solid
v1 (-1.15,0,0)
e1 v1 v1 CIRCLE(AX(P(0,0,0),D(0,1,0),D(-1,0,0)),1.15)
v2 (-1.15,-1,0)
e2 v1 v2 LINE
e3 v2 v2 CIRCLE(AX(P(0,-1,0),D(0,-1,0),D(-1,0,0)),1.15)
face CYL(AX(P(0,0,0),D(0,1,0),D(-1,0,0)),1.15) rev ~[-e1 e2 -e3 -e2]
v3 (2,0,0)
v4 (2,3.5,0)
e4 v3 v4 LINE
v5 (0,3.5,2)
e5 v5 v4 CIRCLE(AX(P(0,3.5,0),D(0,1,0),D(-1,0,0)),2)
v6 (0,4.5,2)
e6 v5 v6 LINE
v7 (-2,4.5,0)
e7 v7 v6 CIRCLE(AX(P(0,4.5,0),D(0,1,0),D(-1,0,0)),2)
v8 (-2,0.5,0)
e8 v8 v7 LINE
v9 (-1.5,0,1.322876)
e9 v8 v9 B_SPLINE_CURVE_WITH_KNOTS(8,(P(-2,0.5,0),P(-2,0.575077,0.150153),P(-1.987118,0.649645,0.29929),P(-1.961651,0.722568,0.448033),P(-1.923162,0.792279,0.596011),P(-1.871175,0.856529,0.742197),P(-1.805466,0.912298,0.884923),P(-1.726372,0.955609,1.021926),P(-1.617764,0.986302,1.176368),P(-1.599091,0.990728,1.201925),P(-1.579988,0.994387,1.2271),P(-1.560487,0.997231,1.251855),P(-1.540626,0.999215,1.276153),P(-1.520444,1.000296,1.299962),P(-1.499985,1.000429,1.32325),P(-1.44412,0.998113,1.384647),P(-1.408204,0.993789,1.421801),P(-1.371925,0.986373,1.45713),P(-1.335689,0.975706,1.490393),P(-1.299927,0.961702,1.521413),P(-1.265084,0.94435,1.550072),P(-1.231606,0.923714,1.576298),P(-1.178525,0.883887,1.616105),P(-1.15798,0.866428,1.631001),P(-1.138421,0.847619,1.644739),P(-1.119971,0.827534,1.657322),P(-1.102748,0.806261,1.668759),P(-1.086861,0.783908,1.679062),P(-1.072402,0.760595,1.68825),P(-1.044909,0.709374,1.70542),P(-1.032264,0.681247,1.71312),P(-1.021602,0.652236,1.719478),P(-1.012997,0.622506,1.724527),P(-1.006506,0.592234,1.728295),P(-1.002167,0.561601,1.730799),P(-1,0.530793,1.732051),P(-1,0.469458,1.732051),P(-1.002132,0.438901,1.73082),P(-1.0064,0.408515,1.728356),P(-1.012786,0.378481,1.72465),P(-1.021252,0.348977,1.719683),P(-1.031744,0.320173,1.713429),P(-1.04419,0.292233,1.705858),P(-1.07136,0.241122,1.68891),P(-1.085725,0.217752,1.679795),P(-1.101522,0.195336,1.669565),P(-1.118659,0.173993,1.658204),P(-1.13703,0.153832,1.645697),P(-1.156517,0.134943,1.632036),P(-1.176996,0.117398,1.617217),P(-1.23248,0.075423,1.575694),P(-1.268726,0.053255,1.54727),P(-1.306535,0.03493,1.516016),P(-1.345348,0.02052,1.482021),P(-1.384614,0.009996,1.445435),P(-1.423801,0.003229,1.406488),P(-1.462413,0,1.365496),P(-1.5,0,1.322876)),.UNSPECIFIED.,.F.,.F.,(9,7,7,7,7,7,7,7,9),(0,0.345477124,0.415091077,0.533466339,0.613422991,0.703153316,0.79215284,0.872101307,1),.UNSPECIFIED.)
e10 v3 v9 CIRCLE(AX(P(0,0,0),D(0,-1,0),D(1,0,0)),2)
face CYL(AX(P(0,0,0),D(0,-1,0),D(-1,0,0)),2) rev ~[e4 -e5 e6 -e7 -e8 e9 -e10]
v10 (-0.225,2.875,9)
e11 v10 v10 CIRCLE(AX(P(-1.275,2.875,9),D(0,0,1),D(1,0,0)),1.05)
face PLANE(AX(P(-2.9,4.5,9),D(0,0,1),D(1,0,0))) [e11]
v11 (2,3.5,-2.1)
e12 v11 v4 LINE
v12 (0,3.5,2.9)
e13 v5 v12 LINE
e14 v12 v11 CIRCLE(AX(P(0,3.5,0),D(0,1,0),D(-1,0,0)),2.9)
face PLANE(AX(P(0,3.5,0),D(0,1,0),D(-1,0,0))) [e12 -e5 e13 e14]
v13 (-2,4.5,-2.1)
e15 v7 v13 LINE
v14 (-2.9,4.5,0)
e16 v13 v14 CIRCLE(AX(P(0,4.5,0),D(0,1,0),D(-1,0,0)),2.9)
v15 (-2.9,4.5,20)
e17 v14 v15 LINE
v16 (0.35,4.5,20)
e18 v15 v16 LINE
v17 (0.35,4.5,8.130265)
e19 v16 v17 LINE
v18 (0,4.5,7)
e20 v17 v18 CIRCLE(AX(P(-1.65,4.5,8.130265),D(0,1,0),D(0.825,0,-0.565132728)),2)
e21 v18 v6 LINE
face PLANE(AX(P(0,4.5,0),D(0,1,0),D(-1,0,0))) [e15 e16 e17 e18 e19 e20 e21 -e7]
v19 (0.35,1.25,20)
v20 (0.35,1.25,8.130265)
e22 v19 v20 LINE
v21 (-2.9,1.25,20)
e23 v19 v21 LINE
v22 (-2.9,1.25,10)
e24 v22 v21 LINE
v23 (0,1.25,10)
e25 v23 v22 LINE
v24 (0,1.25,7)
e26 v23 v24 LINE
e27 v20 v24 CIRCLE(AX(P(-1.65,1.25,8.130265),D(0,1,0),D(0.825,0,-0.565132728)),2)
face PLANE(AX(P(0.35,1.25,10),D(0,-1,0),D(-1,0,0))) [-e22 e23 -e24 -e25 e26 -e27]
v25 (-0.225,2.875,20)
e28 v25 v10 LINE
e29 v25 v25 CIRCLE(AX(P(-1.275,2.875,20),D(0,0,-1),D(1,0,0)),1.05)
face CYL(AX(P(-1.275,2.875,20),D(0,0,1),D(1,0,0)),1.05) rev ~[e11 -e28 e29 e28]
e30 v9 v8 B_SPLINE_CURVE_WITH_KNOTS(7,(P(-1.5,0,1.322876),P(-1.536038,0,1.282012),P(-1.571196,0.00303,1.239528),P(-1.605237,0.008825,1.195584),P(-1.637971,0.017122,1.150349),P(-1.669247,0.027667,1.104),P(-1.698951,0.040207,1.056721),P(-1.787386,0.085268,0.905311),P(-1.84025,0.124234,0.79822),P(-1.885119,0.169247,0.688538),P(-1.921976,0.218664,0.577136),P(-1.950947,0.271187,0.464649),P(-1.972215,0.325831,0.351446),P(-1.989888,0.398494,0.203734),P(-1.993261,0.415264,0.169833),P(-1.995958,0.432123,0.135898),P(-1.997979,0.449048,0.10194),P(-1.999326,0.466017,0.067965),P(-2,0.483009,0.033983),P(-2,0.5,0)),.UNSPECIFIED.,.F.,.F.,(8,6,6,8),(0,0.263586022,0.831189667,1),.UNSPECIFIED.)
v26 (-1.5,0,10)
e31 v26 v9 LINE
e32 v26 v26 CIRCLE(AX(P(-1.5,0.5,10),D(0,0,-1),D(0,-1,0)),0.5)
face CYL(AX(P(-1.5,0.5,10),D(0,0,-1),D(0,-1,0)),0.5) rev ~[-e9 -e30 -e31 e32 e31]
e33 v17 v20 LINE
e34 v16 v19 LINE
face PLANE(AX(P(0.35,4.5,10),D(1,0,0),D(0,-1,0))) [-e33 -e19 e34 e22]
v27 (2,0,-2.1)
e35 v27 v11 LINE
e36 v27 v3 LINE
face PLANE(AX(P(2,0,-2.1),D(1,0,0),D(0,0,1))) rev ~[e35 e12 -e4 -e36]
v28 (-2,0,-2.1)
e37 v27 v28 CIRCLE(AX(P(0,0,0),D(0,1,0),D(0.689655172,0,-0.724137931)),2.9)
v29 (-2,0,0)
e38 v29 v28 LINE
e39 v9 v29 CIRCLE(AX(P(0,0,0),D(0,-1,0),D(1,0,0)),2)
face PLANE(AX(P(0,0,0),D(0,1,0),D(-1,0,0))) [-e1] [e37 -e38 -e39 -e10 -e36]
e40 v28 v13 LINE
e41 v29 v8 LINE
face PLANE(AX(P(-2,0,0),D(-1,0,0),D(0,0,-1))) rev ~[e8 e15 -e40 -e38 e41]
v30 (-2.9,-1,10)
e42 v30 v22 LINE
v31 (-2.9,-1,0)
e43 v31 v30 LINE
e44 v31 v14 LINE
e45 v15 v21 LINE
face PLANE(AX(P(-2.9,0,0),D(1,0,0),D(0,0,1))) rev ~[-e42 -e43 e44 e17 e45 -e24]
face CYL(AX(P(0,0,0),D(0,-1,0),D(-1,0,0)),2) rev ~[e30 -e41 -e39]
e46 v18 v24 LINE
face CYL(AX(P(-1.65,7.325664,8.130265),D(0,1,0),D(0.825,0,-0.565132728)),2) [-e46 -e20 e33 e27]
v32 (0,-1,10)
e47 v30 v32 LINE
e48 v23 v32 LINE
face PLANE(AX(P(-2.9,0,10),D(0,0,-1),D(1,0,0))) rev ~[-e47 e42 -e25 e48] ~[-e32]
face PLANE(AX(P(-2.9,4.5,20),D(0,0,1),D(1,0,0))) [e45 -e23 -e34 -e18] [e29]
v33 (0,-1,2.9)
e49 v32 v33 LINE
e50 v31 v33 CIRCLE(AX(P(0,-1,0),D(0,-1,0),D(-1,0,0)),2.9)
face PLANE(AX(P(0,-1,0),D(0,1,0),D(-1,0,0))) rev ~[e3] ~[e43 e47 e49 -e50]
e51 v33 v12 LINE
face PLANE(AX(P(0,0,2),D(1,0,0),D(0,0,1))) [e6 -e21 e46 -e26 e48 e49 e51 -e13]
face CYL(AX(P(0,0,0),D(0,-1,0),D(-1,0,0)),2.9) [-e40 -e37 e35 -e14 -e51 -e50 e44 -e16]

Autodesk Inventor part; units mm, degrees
ref_plane "YZ Plane" through (0, 0, 0) normal (1, 0, 0) x (0, 1, 0)
ref_plane "XZ Plane" through (0, 0, 0) normal (0, 1, 0) x (-1, 0, 0)
ref_plane "XY Plane" through (0, 0, 0) normal (0, 0, 1) x (1, 0, 0)
sketch "スケッチ1" plane through (0, 0, 0) normal (0, 1, 0) x (-1, 0, 0)
  circle A0 centre (0, 0) radius 1.15
  circle A1 centre (0, 0) radius 2
  circle A2 centre (0, 0) radius 2.9
  line L0 (-2, 0) -> (2, 0)
  line L1 (2, 0) -> (2, -2.9)
  line L2 (2, -2.9) -> (-2, -2.9)
  line L3 (-2, -2.9) -> (-2, 0)
  line L4 (0, 0) -> (0, 2.9)
  line L5 (0, 0) -> (2.9, 0)
  line L6 (2.9, 0) -> (2.9, 10)
  line L7 (2.9, 10) -> (0, 10)
  line L8 (0, 10) -> (0, 0)
  point P0 (0, 2)
  point P1 (2, -2.1)
  point P2 (-2, -2.1)
  dimension "d1" = 4
  dimension "d2" = 5.8
  dimension "d0" = 2.3
  dimension "d3" = 10
extrude "押し出し1" add sketch "スケッチ1" along normal blind 4.5 contours L5 A2 L1 | A1 L4 A2 L5 | A2 L8 L7 L6
extrude "押し出し2" add sketch "スケッチ1" along normal blind 3.5 contours A1 L3 A2 L4
extrude "押し出し3" add sketch "スケッチ1" against normal blind 1 contours L0 A1 A0 | A0 L4 A1 L0 | A0 L0 A1 L4 | L1 A2 L3 A1 | L5 A2 L1 | A1 L4 A2 L5 | A1 L3 A2 L4 | A2 L8 L7 L6
sketch "スケッチ2" plane through (-2.9, 4.5, 10) normal (0, 0, 1) x (1, 0, 0)
  line L0 (2.9, -4.5) -> (1.4, -4.5)
  line L1 (1.4, -4.5) -> (1.4, -4)
  line L2 (1.4, -4) -> (2.9, -4)
  line L3 (2.9, -4) -> (2.9, -4.5)
  dimension "d10" = 1.5
  dimension "d11" = 0.5
hole "穴1" at (-1.5, 0.5, 10) direction (0, 0, -1) diameter 1 end through all
sketch "スケッチ3" plane through (-2.9, 4.5, 10) normal (0, 0, 1) x (1, 0, 0)
  line L0 (0.9, 0) -> (0, 0) projected
  line L1 (0, 0) -> (4, 0)
  line L2 (4, 0) -> (4, -4)
  line L3 (4, -4) -> (0, -4)
  line L4 (0, -4) -> (0, 0)
  line L5 (0, 0) -> (3.25, 0)
  line L6 (3.25, 0) -> (3.25, -3.25)
  line L7 (3.25, -3.25) -> (0, -3.25)
  line L8 (0, -3.25) -> (0, 0)
  line L9 (0, 0) -> (1.625, 0)
  line L10 (1.625, 0) -> (1.625, -1.625)
  line L11 (1.625, -1.625) -> (0, -1.625)
  line L12 (0, -1.625) -> (0, 0)
  point P0 (2.9, -4.5)
  dimension "d19" = 4
  dimension "d20" = 4
  dimension "d21" = 3.25
  dimension "d22" = 3.25
extrude "押し出し4" add sketch "スケッチ3" along normal blind 10 and the other way blind 3 contours L1 L10 L11 L4 L0 | L1 L6 L7 L4 L11 L10
fillet "フィレット1" radius 2 1 edges at (0.35, 2.875, 7)
sketch "スケッチ4" plane through (-2.9, 4.5, 20) normal (0, 0, 1) x (1, 0, 0)
  line L0 (0.9, 0) -> (0, 0) projected
  line L1 (0, 0) -> (1.625, 0)
  line L2 (1.625, 0) -> (1.625, -1.625)
  line L3 (1.625, -1.625) -> (0, -1.625)
  line L4 (0, -1.625) -> (0, 0)
  circle A0 centre (1.625, -1.625) radius 1.05
  point P0 (2.9, -4.5)
  dimension "d28" = 1.625
  dimension "d29" = 1.625
  dimension "d30" = 2.1
extrude "押し出し5" cut sketch "スケッチ4" against normal blind 11 contours A0 L3 L2 | L2 L3 A0
properties part number "srod1.5right"
